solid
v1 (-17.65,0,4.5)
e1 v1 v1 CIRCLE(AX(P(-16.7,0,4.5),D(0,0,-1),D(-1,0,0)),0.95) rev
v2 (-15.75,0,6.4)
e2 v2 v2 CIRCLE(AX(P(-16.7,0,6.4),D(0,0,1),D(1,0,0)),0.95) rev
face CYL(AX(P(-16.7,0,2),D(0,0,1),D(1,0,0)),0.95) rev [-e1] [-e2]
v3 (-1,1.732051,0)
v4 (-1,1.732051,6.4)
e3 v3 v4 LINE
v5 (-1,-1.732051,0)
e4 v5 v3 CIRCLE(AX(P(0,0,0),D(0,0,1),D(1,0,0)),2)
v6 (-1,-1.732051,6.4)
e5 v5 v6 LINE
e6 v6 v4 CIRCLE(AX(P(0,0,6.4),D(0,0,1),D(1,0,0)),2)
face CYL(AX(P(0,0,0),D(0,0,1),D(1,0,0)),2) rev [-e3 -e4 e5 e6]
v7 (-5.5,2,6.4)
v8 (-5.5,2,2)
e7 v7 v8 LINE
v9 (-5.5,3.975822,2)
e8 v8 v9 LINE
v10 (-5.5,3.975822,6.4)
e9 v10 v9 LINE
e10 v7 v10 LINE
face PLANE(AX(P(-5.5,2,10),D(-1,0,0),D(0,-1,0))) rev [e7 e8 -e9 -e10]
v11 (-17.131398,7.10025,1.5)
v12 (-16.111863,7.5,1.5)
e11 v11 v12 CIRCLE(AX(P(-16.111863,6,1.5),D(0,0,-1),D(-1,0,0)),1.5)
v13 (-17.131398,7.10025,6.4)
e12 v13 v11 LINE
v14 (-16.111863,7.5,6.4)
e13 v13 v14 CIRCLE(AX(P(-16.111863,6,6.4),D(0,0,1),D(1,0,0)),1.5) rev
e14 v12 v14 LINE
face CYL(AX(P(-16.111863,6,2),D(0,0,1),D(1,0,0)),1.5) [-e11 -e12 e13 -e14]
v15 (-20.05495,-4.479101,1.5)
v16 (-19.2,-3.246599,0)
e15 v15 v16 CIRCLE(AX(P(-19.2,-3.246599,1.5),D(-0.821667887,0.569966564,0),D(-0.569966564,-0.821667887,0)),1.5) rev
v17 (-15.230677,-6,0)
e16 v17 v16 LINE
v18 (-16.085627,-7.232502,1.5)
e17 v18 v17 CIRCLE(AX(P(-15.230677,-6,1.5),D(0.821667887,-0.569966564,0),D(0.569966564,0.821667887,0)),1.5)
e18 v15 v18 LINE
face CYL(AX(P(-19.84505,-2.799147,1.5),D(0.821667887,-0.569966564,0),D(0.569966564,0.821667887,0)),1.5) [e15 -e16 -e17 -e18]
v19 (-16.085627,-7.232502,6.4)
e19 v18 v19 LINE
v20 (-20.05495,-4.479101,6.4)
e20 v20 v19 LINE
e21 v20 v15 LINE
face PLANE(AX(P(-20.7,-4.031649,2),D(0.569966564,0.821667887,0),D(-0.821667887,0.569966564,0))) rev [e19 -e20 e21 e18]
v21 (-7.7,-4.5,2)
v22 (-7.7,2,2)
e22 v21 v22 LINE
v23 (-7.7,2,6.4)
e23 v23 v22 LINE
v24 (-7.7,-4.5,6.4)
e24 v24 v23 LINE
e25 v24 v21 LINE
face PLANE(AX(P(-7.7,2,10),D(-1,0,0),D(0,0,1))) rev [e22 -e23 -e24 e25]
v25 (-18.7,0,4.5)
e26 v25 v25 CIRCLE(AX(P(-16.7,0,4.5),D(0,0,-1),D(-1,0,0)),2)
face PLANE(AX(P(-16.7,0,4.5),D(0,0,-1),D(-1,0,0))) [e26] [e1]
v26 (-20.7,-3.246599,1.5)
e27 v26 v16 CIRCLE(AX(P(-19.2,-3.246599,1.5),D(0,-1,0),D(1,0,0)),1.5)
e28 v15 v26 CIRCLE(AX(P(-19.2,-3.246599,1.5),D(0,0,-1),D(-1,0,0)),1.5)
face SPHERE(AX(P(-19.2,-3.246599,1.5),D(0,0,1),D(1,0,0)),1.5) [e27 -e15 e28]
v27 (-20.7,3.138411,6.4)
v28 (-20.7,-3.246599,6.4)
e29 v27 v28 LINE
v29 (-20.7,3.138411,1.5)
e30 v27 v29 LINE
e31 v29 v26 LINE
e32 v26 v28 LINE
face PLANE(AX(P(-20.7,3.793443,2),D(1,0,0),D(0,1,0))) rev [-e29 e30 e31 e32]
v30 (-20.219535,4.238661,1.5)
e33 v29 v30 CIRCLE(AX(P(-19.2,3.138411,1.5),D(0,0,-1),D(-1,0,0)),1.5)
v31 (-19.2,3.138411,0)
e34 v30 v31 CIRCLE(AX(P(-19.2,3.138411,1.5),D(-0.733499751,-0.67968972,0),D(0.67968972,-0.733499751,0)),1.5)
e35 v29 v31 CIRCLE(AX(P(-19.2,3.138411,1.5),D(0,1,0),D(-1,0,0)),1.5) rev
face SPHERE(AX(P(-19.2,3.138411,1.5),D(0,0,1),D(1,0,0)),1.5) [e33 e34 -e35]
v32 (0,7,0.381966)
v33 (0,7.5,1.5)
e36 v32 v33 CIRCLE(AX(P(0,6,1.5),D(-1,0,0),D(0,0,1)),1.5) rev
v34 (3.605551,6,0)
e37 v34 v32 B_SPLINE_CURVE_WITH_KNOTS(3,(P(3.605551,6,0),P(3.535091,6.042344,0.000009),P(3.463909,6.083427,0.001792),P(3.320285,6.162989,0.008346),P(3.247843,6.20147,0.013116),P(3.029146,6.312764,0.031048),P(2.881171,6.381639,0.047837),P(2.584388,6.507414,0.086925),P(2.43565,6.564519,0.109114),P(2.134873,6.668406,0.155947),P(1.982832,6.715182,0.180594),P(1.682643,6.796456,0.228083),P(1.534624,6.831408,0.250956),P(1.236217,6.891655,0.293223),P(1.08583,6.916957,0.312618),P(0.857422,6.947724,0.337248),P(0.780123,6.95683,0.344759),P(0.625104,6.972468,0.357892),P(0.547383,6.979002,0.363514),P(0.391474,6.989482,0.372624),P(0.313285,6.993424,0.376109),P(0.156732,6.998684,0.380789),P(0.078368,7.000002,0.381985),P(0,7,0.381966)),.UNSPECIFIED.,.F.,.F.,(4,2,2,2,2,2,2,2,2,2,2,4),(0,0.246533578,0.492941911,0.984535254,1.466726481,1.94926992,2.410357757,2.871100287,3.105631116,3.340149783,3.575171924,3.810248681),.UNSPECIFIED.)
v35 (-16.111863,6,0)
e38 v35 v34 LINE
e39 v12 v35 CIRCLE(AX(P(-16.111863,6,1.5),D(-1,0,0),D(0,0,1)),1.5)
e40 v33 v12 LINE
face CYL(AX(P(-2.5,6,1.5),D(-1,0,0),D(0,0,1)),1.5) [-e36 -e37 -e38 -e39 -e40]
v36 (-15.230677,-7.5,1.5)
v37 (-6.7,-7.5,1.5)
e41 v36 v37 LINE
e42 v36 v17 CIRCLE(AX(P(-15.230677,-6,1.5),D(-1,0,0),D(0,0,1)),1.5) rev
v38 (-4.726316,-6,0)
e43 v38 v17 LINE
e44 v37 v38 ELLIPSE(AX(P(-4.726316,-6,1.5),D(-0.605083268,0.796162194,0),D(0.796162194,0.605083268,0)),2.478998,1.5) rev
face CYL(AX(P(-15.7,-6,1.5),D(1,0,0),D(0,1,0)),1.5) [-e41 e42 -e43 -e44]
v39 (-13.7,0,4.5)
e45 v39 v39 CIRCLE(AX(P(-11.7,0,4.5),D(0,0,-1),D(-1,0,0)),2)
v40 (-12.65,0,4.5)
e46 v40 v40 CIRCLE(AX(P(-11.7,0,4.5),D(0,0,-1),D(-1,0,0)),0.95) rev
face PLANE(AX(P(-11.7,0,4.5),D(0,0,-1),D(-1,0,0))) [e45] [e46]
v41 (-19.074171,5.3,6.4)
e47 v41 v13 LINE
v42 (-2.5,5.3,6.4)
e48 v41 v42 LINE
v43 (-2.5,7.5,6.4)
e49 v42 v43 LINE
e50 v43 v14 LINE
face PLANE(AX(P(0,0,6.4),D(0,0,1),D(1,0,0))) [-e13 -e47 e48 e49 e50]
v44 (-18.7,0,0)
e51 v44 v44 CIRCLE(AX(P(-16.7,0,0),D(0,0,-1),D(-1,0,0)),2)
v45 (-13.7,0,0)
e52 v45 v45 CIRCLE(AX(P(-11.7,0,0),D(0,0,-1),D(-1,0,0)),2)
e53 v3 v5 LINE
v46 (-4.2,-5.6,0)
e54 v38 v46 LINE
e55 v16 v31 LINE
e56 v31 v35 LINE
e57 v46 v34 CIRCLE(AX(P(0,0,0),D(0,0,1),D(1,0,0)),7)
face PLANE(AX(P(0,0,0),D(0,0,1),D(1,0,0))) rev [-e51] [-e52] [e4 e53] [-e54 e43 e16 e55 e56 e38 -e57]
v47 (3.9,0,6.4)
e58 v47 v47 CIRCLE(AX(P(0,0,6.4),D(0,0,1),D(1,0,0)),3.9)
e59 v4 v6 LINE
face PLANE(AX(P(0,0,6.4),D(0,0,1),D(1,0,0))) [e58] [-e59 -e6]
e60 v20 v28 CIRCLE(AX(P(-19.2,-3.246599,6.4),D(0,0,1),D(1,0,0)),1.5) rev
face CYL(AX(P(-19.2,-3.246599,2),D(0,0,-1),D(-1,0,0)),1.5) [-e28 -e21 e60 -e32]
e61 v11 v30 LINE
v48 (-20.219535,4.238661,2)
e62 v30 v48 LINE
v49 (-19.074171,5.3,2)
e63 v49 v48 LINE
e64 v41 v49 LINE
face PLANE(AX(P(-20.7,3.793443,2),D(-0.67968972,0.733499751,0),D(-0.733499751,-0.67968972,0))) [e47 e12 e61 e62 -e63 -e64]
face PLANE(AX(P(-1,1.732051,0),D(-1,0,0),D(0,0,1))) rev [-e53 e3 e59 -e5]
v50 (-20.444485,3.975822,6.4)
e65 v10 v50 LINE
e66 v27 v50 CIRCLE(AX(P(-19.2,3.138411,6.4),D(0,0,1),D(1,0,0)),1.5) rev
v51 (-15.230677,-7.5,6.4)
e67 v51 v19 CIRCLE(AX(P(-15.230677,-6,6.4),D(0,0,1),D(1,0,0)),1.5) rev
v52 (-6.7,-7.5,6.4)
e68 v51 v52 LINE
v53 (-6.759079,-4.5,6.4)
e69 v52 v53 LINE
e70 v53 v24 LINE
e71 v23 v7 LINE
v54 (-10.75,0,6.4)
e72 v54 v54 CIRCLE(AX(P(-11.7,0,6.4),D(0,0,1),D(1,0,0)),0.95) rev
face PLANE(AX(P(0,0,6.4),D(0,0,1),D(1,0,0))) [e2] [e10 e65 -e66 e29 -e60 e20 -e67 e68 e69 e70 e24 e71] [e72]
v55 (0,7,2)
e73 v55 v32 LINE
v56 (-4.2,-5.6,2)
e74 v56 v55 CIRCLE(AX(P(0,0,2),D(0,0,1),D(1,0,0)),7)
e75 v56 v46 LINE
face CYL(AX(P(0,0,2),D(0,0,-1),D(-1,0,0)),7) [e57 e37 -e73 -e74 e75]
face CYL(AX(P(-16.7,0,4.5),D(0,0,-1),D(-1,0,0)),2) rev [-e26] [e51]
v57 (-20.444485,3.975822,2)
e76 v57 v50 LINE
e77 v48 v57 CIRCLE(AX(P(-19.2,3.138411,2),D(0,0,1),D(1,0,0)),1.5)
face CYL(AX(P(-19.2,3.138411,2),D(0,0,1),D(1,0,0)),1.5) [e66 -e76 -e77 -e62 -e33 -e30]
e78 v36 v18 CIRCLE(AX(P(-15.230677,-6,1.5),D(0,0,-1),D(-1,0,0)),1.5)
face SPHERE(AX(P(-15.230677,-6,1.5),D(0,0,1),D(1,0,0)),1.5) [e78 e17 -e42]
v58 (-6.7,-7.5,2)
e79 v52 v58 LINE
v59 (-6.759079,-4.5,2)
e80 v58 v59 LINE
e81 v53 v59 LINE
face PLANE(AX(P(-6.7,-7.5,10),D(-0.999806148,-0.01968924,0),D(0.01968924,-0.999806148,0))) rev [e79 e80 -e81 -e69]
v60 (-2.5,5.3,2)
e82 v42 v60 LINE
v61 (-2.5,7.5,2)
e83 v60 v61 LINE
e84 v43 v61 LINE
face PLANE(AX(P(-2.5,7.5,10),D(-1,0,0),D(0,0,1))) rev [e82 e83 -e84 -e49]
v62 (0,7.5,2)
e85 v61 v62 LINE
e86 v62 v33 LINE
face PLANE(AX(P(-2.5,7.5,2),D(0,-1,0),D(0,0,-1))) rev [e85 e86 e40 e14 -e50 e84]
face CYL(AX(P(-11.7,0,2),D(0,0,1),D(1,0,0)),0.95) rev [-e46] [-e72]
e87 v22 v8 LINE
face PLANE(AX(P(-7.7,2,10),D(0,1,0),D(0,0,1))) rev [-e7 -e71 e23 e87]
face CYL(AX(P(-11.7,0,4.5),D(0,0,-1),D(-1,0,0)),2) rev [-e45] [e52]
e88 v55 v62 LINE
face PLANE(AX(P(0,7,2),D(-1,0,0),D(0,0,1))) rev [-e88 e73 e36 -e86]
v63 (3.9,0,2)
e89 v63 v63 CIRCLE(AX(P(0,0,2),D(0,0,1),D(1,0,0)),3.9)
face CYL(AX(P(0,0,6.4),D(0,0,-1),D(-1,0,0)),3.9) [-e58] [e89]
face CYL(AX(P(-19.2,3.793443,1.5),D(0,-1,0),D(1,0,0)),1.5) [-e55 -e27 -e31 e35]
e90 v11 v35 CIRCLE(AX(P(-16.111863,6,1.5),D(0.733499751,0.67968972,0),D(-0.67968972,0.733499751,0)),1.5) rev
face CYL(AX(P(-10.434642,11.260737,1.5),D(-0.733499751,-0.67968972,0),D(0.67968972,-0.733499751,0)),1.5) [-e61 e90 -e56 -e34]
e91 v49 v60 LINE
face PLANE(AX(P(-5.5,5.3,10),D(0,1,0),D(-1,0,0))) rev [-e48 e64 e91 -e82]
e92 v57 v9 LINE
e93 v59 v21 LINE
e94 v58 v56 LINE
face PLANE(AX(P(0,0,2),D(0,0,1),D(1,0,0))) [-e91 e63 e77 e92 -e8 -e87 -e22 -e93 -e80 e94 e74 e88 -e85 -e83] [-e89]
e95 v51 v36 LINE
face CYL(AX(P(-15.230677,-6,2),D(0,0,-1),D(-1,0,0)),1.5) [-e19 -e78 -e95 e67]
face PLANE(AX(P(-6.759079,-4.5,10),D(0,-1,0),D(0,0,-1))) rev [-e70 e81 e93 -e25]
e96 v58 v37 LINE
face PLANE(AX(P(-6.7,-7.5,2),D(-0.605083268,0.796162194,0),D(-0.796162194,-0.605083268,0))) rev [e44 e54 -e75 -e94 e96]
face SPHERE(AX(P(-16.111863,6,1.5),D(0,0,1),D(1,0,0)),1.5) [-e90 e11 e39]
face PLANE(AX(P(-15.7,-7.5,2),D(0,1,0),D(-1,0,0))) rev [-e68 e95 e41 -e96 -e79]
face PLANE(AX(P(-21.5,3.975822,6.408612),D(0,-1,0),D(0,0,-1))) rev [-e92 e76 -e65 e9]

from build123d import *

# Parameters (mm, degrees)
BOSS_EXTRUDE1_DEPTH      = 2
BOSS_EXTRUDE2_DEPTH      = 8
SKETCH24_R               = 3.9
BOSS_EXTRUDE5_DEPTH      = 4.4
SKETCH30_W               = 4.40861202
SKETCH30_H               = 1.324178481
CUT_EXTRUDE12_DEPTH      = 16
CUT_EXTRUDE11_DEPTH      = 23.928148639
FILLET1_R                = 1.5
SKETCH34_R               = 0.75
CUT_EXTRUDE13_DEPTH      = 8
SKETCH35_R               = 0.75
CUT_EXTRUDE14_DEPTH      = 3
CUT_EXTRUDE14_DEPTH_BACK = 8
SKETCH36_R               = 0.95
CUT_EXTRUDE15_DEPTH      = 8
SKETCH37_R               = 2
CUT_EXTRUDE16_DEPTH      = 4.5
SKETCH38_W               = 3
SKETCH38_H               = 1.25
CUT_EXTRUDE17_DEPTH      = 3.6


with BuildPart() as part:
    # Sketch2 → Boss-Extrude1 (new body)
    with BuildSketch(Plane.XY):
        with BuildLine():
            Line((-2.5, 7.5), (-16.7, 7.5))
            Line((-16.7, 7.5), (-20.7, 3.793442666))
            Line((-20.7, 3.793442666), (-20.7, -4.031648778))
            Line((-20.7, -4.031648778), (-15.7, -7.5))
            Line((-15.7, -7.5), (-6.7, -7.5))
            Line((-6.7, -7.5), (-4.2, -5.6))
            ThreePointArc((-4.2, -5.6), (3.130495168, -6.260990337), (7, 0))
            ThreePointArc((7, 0), (4.949747468, 4.949747468), (0, 7))
            Line((0, 7), (0, 7.5))
            Line((0, 7.5), (-2.5, 7.5))
        make_face()
    extrude(amount=BOSS_EXTRUDE1_DEPTH)

    # Sketch4 → Boss-Extrude2 (add)
    with BuildSketch(Plane.XY.offset(2)):
        Polygon((-15.7, -7.5), (-6.7, -7.5), (-6.759079174, -4.5), (-7.7, -4.5), (-7.7, 2), (-5.5, 2), (-5.5, 5.3), (-2.5, 5.3), (-2.5, 7.5), (-16.7, 7.5), (-20.7, 3.793442666), (-20.7, -4.031648778), align=None)
    extrude(amount=BOSS_EXTRUDE2_DEPTH)

    # Sketch24 → Boss-Extrude5 (add)
    with BuildSketch(Plane.XY.offset(2)):
        Circle(SKETCH24_R)
    extrude(amount=BOSS_EXTRUDE5_DEPTH)

    # Sketch30 → Cut-Extrude12 (cut)
    with BuildSketch(Plane(origin=(-5.5, 0, 0), x_dir=(0, 0, -1), z_dir=(1, 0, 0))):
        with Locations((-4.20430601, 4.63791076)):
            Rectangle(SKETCH30_W, SKETCH30_H)
    extrude(amount=-CUT_EXTRUDE12_DEPTH, mode=Mode.SUBTRACT)

    # Sketch28 → Cut-Extrude11 (cut, through all)
    with BuildSketch(Plane.XY.offset(6.4)):
        with BuildLine():
            Line((-1, 1.732050808), (-1, -1.732050808))
            ThreePointArc((-1, -1.732050808), (2, 0), (-1, 1.732050808))
        make_face()
    extrude(amount=-CUT_EXTRUDE11_DEPTH, mode=Mode.SUBTRACT)

    # Fillet1
    # the kernel refuses this fillet: 1.5 mm, written as the material it takes off along each edge
    with BuildSketch(Plane(origin=(-15.230677435, -6, 1.5), x_dir=(-0.5699665637840448, -0.8216678867816415, 0), z_dir=(0, 0, -1))) as fillet1_piece_1_section:
        Polygon((0, 0), (FILLET1_R * 1.02, 0), (FILLET1_R * 1.02, -FILLET1_R * 0.319139344377), (FILLET1_R * 0.838101244517, -FILLET1_R * 0.58136589506), align=None)
    fillet1_piece_1 = extrude(amount=FILLET1_R * 1.02, mode=Mode.PRIVATE)
    fillet1_piece_1 = fillet1_piece_1 - Plane(origin=(-15.230677435, -6, 1.5), x_dir=(0.29860685961507855, 0.9543762064253388, 0), z_dir=(0, 0, -1)) * Sphere(FILLET1_R, mode=Mode.PRIVATE)
    add(fillet1_piece_1, mode=Mode.SUBTRACT)
    with BuildSketch(Plane(origin=(-16.11186344, 6, 1.5), x_dir=(-0.6796897201843015, 0.7334997506991983, 0), z_dir=(0, 0, -1))) as fillet1_piece_2_section:
        Polygon((0, 0), (FILLET1_R * 1.02, 0), (FILLET1_R * 1.02, FILLET1_R * 0.399932860855), (FILLET1_R * 0.748169745713, FILLET1_R * 0.693283514588), align=None)
    fillet1_piece_2 = extrude(amount=FILLET1_R * 1.02, mode=Mode.PRIVATE)
    fillet1_piece_2 = fillet1_piece_2 - Plane(origin=(-16.11186344, 6, 1.5), x_dir=(0.3650344157067945, -0.9309940254102596, 0), z_dir=(0, 0, -1)) * Sphere(FILLET1_R, mode=Mode.PRIVATE)
    add(fillet1_piece_2, mode=Mode.SUBTRACT)
    with BuildSketch(Plane(origin=(-19.2, 3.138411196, 1.5), x_dir=(-0.6796897201843015, 0.7334997506991983, 0), z_dir=(0, 0, -1))) as fillet1_piece_3_section:
        Polygon((0, 0), (FILLET1_R * 1.02, 0), (FILLET1_R * 1.02, -FILLET1_R * 0.445421399395), (FILLET1_R * 0.693283514588, -FILLET1_R * 0.748169745713), align=None)
    fillet1_piece_3 = extrude(amount=FILLET1_R * 1.02, mode=Mode.PRIVATE)
    fillet1_piece_3 = fillet1_piece_3 - Plane(origin=(-19.2, 3.138411196, 1.5), x_dir=(0.9164304993244992, -0.40019387789901173, 0), z_dir=(0, 0, -1)) * Sphere(FILLET1_R, mode=Mode.PRIVATE)
    add(fillet1_piece_3, mode=Mode.SUBTRACT)
    with BuildSketch(Plane(origin=(-19.2, -3.246599046, 1.5), x_dir=(-0.5699665637840448, -0.8216678867816415, 0), z_dir=(0, 0, -1))) as fillet1_piece_4_section:
        Polygon((0, 0), (FILLET1_R * 1.02, 0), (FILLET1_R * 1.02, FILLET1_R * 0.533833817771), (FILLET1_R * 0.58136589506, FILLET1_R * 0.838101244517), align=None)
    fillet1_piece_4 = extrude(amount=FILLET1_R * 1.02, mode=Mode.PRIVATE)
    fillet1_piece_4 = fillet1_piece_4 - Plane(origin=(-19.2, -3.246599046, 1.5), x_dir=(0.8859928227090906, 0.46369895202380795, 0), z_dir=(0, 0, -1)) * Sphere(FILLET1_R, mode=Mode.PRIVATE)
    add(fillet1_piece_4, mode=Mode.SUBTRACT)
    with BuildSketch(Plane(origin=(-15.230677435, -7.5, 0), x_dir=(0, 1, 0), z_dir=(1, 0, 0))) as fillet1_piece_5_section:
        with BuildLine():
            CenterArc((FILLET1_R, FILLET1_R), FILLET1_R, 180, 90)
            Line((0, FILLET1_R), (0, 0))
            Line((0, 0), (FILLET1_R, 0))
        make_face()
    fillet1_piece_5 = extrude(amount=12.280677435, mode=Mode.PRIVATE)
    fillet1_piece_5 = split(fillet1_piece_5, bisect_by=Plane(origin=(-9.092127217, -9.318016685, 0.3282266), z_dir=(-0.6050832675335577, 0.7961621941231027, 0)), keep=Keep.TOP, mode=Mode.PRIVATE)
    add(fillet1_piece_5, mode=Mode.SUBTRACT)
    with BuildSketch(Plane(origin=(3.75, 7.5, 0), x_dir=(0, 0, 1), z_dir=(-1, 0, 0))) as fillet1_piece_6:
        with BuildLine():
            CenterArc((FILLET1_R, -FILLET1_R), FILLET1_R, 90, 90)
            Line((0, -FILLET1_R), (0, 0))
            Line((0, 0), (FILLET1_R, 0))
        make_face()
    extrude(amount=19.86186344, mode=Mode.SUBTRACT)
    with BuildSketch(Plane(origin=(-17.13139802, 7.100249626, 0), x_dir=(0.6796897201843014, -0.7334997506991981, 0), z_dir=(-0.7334997506991983, -0.6796897201843015, 0))) as fillet1_piece_7:
        with BuildLine():
            CenterArc((FILLET1_R, FILLET1_R), FILLET1_R, 180, 90)
            Line((0, FILLET1_R), (0, 0))
            Line((0, 0), (FILLET1_R, 0))
        make_face()
    extrude(amount=4.21013989, mode=Mode.SUBTRACT)
    with BuildSketch(Plane(origin=(-20.054949846, -4.479100876, 0), x_dir=(0.5699665637840448, 0.8216678867816416, 0), z_dir=(0.8216678867816415, -0.5699665637840448, 0))) as fillet1_piece_8:
        with BuildLine():
            CenterArc((FILLET1_R, FILLET1_R), FILLET1_R, 180, 90)
            Line((0, FILLET1_R), (0, 0))
            Line((0, 0), (FILLET1_R, 0))
        make_face()
    extrude(amount=4.830811364, mode=Mode.SUBTRACT)
    with BuildSketch(Plane(origin=(-20.7, 3.138411196, 0), x_dir=(1, 0, 0), z_dir=(0, -1, 0))) as fillet1_piece_9:
        with BuildLine():
            CenterArc((FILLET1_R, FILLET1_R), FILLET1_R, 180, 90)
            Line((0, FILLET1_R), (0, 0))
            Line((0, 0), (FILLET1_R, 0))
        make_face()
    extrude(amount=6.385010242, mode=Mode.SUBTRACT)
    with BuildSketch(Plane(origin=(-15.7, -7.5, 1.5), x_dir=(1, 0, 0), z_dir=(0, 0, 1))) as fillet1_piece_10:
        with BuildLine():
            CenterArc((FILLET1_R * 0.312881710173, FILLET1_R), FILLET1_R, 235.252105822, 34.747894178)
            Line((-FILLET1_R * 0.257084853611, FILLET1_R * 0.178332113218), (0, 0))
            Line((0, 0), (FILLET1_R * 0.312881710173, 0))
        make_face()
    extrude(amount=9.673306413, mode=Mode.SUBTRACT)
    with BuildSketch(Plane(origin=(-20.7, -4.031648778, 1.5), x_dir=(0, 1, 0), z_dir=(0, 0, 1))) as fillet1_piece_11:
        with BuildLine():
            CenterArc((FILLET1_R * 0.523366488011, -FILLET1_R), FILLET1_R, 90, 55.252105822)
            Line((-FILLET1_R * 0.298301398771, -FILLET1_R * 0.430033436216), (0, 0))
            Line((0, 0), (FILLET1_R * 0.523366488011, 0))
        make_face()
    extrude(amount=10.46262433, mode=Mode.SUBTRACT)
    with BuildSketch(Plane(origin=(-20.7, 3.793442666, 1.5), x_dir=(0.7334997506991984, 0.6796897201843014, 0), z_dir=(0, 0, 1))) as fillet1_piece_12:
        with BuildLine():
            CenterArc((FILLET1_R * 0.436687646465, -FILLET1_R), FILLET1_R, 90, 47.18059856)
            Line((-FILLET1_R * 0.296812104234, -FILLET1_R * 0.320310279816), (0, 0))
            Line((0, 0), (FILLET1_R * 0.436687646465, 0))
        make_face()
    extrude(amount=10.137578674, mode=Mode.SUBTRACT)
    with BuildSketch(Plane(origin=(-16.7, 7.5, 1.5), x_dir=(1, 0, 0), z_dir=(0, 0, 1))) as fillet1_piece_13:
        with BuildLine():
            CenterArc((FILLET1_R * 0.392091040054, -FILLET1_R), FILLET1_R, 90, 42.81940144)
            Line((-FILLET1_R * 0.287598680131, -FILLET1_R * 0.266500249301), (0, 0))
            Line((0, 0), (FILLET1_R * 0.392091040054, 0))
        make_face()
    extrude(amount=9.9703414, mode=Mode.SUBTRACT)

    # Sketch34 → Cut-Extrude13 (cut, along a direction that is not the sketch's normal)
    with BuildSketch(Plane.XZ.offset(-2)):
        with Locations((-7, 10)):
            Circle(SKETCH34_R)
    extrude(amount=-CUT_EXTRUDE13_DEPTH, dir=(0.6685833876565112, -0.7436371788377336, 0), mode=Mode.SUBTRACT)

    # Sketch35 → Cut-Extrude14 (cut, two sides, along a direction that is not the sketch's normal)
    with BuildSketch(Plane(origin=(0, -4.5, 0), x_dir=(1, 0, 0), z_dir=(0, 1, 0))) as cut_extrude14_sk:
        with Locations((-8.259079174, -10)):
            Circle(SKETCH35_R)
    extrude(amount=CUT_EXTRUDE14_DEPTH, dir=(0.5999194182208608, 0.8000604299935998, 0), mode=Mode.SUBTRACT)
    extrude(cut_extrude14_sk.sketch, amount=-CUT_EXTRUDE14_DEPTH_BACK, dir=(0.5999194182208608, 0.8000604299935998, 0), mode=Mode.SUBTRACT)

    # Sketch36 → Cut-Extrude15 (cut)
    with BuildSketch(Plane.XY.offset(10)):
        with Locations((-11.7, 0)):
            Circle(SKETCH36_R)
        with Locations((-16.7, 0)):
            Circle(SKETCH36_R)
    extrude(amount=-CUT_EXTRUDE15_DEPTH, mode=Mode.SUBTRACT)

    # Sketch37 → Cut-Extrude16 (cut)
    with BuildSketch(Plane(origin=(0, 0, 0), x_dir=(-1, 0, 0), z_dir=(0, 0, -1))):
        with Locations((11.7, 0)):
            Circle(SKETCH37_R)
        with Locations((16.7, 0)):
            Circle(SKETCH37_R)
    extrude(amount=-CUT_EXTRUDE16_DEPTH, mode=Mode.SUBTRACT)

    # Sketch38 → Cut-Extrude17 (cut)
    with BuildSketch(Plane.XY.offset(10)):
        with Locations((-4, 5.925)):
            Rectangle(SKETCH38_W, SKETCH38_H)
    extrude(amount=-CUT_EXTRUDE17_DEPTH, mode=Mode.SUBTRACT)


with BuildPart() as body_2:
    # Split1: the piece on the far side of the plane
    add(part.part)
    split(bisect_by=Plane.XY.offset(6.4), keep=Keep.BOTTOM)


with BuildPart() as part_1:
    add(part.part)

    # Split1
    split(bisect_by=Plane.XY.offset(6.4), keep=Keep.TOP)


solid = body_2.part
